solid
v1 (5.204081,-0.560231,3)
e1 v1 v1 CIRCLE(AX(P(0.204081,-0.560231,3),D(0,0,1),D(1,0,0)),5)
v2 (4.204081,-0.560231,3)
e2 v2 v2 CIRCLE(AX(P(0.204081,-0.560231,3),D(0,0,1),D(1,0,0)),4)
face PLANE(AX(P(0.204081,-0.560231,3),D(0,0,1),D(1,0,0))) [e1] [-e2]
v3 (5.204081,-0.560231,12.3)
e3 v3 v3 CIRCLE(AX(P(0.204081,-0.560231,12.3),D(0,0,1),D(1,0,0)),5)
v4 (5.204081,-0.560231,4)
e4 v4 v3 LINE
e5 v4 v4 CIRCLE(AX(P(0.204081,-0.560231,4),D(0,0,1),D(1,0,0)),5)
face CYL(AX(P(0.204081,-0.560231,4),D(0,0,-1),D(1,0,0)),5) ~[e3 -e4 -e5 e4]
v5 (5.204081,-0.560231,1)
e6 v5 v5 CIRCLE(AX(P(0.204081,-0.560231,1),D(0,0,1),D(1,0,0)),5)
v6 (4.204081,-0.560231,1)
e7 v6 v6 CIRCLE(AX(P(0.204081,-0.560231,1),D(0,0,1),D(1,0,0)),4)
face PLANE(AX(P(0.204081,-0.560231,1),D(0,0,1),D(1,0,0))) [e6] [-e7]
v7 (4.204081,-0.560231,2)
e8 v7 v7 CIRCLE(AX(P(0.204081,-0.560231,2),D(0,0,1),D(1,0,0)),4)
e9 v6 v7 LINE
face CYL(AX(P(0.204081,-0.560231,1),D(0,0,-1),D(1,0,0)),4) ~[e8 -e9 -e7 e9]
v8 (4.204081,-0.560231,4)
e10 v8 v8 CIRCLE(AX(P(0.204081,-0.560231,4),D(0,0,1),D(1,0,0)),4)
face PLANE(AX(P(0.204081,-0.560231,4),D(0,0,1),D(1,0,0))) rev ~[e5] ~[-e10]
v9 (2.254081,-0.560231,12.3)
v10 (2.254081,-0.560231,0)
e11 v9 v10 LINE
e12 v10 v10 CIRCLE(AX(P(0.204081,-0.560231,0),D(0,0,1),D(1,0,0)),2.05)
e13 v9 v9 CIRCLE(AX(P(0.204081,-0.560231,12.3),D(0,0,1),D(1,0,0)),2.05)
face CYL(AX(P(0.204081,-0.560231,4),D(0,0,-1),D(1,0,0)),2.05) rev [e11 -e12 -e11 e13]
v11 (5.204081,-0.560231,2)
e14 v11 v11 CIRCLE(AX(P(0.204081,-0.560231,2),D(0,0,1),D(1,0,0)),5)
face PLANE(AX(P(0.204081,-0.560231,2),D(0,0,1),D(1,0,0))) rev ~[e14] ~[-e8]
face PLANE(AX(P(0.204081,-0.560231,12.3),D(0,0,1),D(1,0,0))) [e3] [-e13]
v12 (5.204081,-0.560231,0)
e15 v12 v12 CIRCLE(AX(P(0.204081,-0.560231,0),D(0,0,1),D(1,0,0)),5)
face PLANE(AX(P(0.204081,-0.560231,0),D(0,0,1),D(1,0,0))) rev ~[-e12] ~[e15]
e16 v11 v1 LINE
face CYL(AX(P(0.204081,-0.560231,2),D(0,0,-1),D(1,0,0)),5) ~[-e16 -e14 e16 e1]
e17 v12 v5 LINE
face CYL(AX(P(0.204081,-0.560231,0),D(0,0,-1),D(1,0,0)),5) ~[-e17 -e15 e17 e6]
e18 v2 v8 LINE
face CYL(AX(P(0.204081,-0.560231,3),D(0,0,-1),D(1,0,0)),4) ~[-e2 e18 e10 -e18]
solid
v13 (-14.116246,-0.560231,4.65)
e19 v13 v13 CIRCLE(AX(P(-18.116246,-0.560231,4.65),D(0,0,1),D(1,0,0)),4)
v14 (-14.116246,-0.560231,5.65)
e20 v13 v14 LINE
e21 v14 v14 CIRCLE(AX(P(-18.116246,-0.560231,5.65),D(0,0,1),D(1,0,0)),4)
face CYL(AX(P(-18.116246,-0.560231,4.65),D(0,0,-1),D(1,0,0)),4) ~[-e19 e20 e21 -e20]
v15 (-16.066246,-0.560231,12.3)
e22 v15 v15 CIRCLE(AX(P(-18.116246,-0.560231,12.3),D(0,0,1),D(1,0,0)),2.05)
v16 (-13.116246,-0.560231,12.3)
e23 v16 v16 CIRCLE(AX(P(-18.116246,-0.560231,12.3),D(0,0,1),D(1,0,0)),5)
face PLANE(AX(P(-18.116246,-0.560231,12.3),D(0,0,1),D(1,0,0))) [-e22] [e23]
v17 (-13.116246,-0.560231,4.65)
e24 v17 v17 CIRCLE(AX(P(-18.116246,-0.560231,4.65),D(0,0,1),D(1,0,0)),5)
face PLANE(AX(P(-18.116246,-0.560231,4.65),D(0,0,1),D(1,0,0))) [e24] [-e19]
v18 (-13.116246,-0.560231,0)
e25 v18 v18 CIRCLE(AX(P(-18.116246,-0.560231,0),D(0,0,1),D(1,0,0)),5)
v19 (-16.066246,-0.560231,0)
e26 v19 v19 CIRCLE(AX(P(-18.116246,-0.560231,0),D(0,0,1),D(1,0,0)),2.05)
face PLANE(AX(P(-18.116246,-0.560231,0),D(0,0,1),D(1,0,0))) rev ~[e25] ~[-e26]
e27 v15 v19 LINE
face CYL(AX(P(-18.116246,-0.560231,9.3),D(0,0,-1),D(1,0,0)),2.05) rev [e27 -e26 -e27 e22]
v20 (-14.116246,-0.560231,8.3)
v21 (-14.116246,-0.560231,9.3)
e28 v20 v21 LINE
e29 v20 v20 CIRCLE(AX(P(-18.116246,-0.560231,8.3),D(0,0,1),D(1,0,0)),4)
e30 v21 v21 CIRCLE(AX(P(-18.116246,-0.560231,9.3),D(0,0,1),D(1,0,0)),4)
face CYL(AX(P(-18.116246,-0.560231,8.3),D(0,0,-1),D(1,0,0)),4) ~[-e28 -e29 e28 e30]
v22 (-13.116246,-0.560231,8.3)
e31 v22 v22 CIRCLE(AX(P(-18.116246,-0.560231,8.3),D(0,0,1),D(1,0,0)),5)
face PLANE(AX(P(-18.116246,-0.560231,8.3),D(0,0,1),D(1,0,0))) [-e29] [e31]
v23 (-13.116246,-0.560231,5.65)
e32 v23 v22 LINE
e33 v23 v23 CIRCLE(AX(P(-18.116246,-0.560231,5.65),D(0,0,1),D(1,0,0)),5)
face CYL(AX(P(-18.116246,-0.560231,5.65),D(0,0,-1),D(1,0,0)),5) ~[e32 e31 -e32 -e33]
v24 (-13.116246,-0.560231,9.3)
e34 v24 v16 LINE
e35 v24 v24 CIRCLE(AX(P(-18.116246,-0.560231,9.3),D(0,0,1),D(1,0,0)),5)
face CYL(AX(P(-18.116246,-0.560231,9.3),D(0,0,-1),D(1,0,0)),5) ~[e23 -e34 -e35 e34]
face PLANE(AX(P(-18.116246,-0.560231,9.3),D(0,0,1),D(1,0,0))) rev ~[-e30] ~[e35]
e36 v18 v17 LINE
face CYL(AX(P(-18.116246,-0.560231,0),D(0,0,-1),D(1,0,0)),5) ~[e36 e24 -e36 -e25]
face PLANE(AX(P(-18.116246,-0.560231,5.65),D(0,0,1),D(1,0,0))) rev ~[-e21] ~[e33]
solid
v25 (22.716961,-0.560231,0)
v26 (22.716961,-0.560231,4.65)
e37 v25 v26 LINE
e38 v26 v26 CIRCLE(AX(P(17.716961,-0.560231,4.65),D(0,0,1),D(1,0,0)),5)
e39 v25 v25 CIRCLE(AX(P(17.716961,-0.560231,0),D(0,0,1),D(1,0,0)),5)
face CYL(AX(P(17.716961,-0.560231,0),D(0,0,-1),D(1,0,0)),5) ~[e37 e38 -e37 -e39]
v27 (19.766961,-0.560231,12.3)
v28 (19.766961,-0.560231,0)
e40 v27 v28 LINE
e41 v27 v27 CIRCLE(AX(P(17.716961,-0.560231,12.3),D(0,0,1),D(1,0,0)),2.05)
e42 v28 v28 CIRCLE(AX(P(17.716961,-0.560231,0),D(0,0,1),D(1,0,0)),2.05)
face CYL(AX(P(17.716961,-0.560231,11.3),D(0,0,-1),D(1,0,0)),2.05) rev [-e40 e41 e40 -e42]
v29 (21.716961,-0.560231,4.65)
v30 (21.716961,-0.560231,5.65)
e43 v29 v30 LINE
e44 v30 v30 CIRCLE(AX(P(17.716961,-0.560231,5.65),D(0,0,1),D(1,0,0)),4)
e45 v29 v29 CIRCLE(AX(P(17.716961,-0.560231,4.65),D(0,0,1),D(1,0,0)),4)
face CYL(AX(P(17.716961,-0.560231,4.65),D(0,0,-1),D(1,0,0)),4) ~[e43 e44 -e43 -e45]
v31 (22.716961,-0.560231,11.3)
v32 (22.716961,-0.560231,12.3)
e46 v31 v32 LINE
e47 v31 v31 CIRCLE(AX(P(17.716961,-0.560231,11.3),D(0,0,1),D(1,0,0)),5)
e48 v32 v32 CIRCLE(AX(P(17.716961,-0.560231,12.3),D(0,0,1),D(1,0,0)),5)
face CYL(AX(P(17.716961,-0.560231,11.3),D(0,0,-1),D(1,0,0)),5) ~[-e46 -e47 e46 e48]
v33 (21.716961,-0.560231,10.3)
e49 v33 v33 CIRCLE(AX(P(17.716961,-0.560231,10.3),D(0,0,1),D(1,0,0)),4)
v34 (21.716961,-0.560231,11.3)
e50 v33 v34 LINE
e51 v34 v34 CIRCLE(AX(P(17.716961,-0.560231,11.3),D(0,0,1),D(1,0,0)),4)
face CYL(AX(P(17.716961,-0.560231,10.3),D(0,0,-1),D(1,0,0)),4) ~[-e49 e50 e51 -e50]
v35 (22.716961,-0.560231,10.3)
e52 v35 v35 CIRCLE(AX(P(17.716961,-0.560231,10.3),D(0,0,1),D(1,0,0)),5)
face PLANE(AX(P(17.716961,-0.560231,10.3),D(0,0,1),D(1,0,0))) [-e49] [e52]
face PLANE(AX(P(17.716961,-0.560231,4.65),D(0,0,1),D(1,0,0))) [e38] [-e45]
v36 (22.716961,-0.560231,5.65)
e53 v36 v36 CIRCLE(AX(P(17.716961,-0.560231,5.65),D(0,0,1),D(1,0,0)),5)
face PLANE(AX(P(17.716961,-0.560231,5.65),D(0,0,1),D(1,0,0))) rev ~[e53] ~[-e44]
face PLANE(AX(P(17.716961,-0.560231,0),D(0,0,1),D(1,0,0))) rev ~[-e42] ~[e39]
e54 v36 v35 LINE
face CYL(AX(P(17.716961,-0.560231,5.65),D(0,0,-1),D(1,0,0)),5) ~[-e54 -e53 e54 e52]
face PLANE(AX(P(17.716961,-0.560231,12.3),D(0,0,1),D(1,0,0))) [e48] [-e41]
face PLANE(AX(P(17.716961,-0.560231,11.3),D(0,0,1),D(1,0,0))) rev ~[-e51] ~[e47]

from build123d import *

# Parameters (mm, degrees)
F0_R      = 5
F0_R_2    = 2.05
F1_DEPTH  = 1
F2_R      = 4
F2_R_2    = 2.05
F3_DEPTH  = 1
F4_R      = 5
F4_R_2    = 4
F4_R_3    = 2.05
F5_DEPTH  = 1
F6_R      = 4
F6_R_2    = 2.05
F7_DEPTH  = 1
F8_R      = 5
F8_R_2    = 4
F8_R_3    = 2.05
F9_DEPTH  = 8.3
F10_DEPTH = 4.65
F11_R     = 4
F11_R_2   = 2.05
F12_DEPTH = 1
F13_R     = 5
F13_R_2   = 4
F13_R_3   = 2.05
F14_DEPTH = 4.65
F15_DEPTH = 4.65
F16_R     = 4
F16_R_2   = 2.05
F17_DEPTH = 1
F18_R     = 5
F18_R_2   = 4
F18_R_3   = 2.05
F19_DEPTH = 2.65
F20_R     = 4
F20_R_2   = 2.05
F21_DEPTH = 1
F22_R     = 5
F22_R_2   = 4
F22_R_3   = 2.05
F23_DEPTH = 3
F24_R     = 4
F24_R_2   = 2.05
F25_DEPTH = 1
F26_R     = 5
F26_R_2   = 4
F26_R_3   = 2.05
F27_DEPTH = 1


with BuildPart() as f1:
    # F0 (on Top) → F1 (new body)
    with BuildSketch(Plane.XY):
        with Locations((0.204080643, -0.5602314472)):
            Circle(F0_R)
        with Locations((0.204080643, -0.5602314472)):
            Circle(F0_R_2, mode=Mode.SUBTRACT)
    extrude(amount=F1_DEPTH)

    # F2 (on face) → F3 (join)
    with BuildSketch(Plane.XY.offset(1)):
        with Locations((0.204080643, -0.5602314472)):
            Circle(F2_R)
        with Locations((0.204080643, -0.5602314472)):
            Circle(F2_R_2, mode=Mode.SUBTRACT)
    extrude(amount=F3_DEPTH)

    # F4 (on face) → F5 (join)
    with BuildSketch(Plane.XY.offset(2)):
        with Locations((0.204080643, -0.5602314472)):
            Circle(F4_R)
        with Locations((0.204080643, -0.5602314472)):
            Circle(F4_R_2, mode=Mode.SUBTRACT)
        with Locations((0.204080643, -0.5602314472)):
            Circle(F4_R_2)
        with Locations((0.204080643, -0.5602314472)):
            Circle(F4_R_3, mode=Mode.SUBTRACT)
    extrude(amount=F5_DEPTH)

    # F6 (on face) → F7 (join)
    with BuildSketch(Plane.XY.offset(3)):
        with Locations((0.204080643, -0.5602314472)):
            Circle(F6_R)
        with Locations((0.204080643, -0.5602314472)):
            Circle(F6_R_2, mode=Mode.SUBTRACT)
    extrude(amount=F7_DEPTH)

    # F8 (on face) → F9 (join)
    with BuildSketch(Plane.XY.offset(4)):
        with Locations((0.204080643, -0.5602314472)):
            Circle(F8_R)
        with Locations((0.204080643, -0.5602314472)):
            Circle(F8_R_2, mode=Mode.SUBTRACT)
        with Locations((0.204080643, -0.5602314472)):
            Circle(F8_R_2)
        with Locations((0.204080643, -0.5602314472)):
            Circle(F8_R_3, mode=Mode.SUBTRACT)
    extrude(amount=F9_DEPTH)


with BuildPart() as f10:
    # F0 (on Top) → F10 (new body)
    with BuildSketch(Plane.XY):
        with Locations((17.7169614471, -0.5602314472)):
            Circle(F0_R)
        with Locations((17.7169614471, -0.5602314472)):
            Circle(F0_R_2, mode=Mode.SUBTRACT)
    extrude(amount=F10_DEPTH)

    # F11 (on face) → F12 (join)
    with BuildSketch(Plane.XY.offset(4.65)):
        with Locations((17.7169614471, -0.5602314472)):
            Circle(F11_R)
        with Locations((17.7169614471, -0.5602314472)):
            Circle(F11_R_2, mode=Mode.SUBTRACT)
    extrude(amount=F12_DEPTH)

    # F13 (on face) → F14 (join)
    with BuildSketch(Plane.XY.offset(5.65)):
        with Locations((17.7169614471, -0.5602314472)):
            Circle(F13_R)
        with Locations((17.7169614471, -0.5602314472)):
            Circle(F13_R_2, mode=Mode.SUBTRACT)
        with Locations((17.7169614471, -0.5602314472)):
            Circle(F13_R_2)
        with Locations((17.7169614471, -0.5602314472)):
            Circle(F13_R_3, mode=Mode.SUBTRACT)
    extrude(amount=F14_DEPTH)

    # F24 (on face) → F25 (join)
    with BuildSketch(Plane.XY.offset(10.3)):
        with Locations((17.7169614471, -0.5602314472)):
            Circle(F24_R)
        with Locations((17.7169614471, -0.5602314472)):
            Circle(F24_R_2, mode=Mode.SUBTRACT)
    extrude(amount=F25_DEPTH)

    # F26 (on face) → F27 (join)
    with BuildSketch(Plane.XY.offset(11.3)):
        with Locations((17.7169614471, -0.5602314472)):
            Circle(F26_R)
        with Locations((17.7169614471, -0.5602314472)):
            Circle(F26_R_2, mode=Mode.SUBTRACT)
        with Locations((17.7169614471, -0.5602314472)):
            Circle(F26_R_2)
        with Locations((17.7169614471, -0.5602314472)):
            Circle(F26_R_3, mode=Mode.SUBTRACT)
    extrude(amount=F27_DEPTH)


with BuildPart() as f15:
    # F0 (on Top) → F15 (new body)
    with BuildSketch(Plane.XY):
        with Locations((-18.1162464432, -0.5602314472)):
            Circle(F0_R)
        with Locations((-18.1162464432, -0.5602314472)):
            Circle(F0_R_2, mode=Mode.SUBTRACT)
    extrude(amount=F15_DEPTH)

    # F16 (on face) → F17 (join)
    with BuildSketch(Plane.XY.offset(4.65)):
        with Locations((-18.1162464432, -0.5602314472)):
            Circle(F16_R)
        with Locations((-18.1162464432, -0.5602314472)):
            Circle(F16_R_2, mode=Mode.SUBTRACT)
    extrude(amount=F17_DEPTH)

    # F18 (on face) → F19 (join)
    with BuildSketch(Plane.XY.offset(5.65)):
        with Locations((-18.1162464432, -0.5602314472)):
            Circle(F18_R)
        with Locations((-18.1162464432, -0.5602314472)):
            Circle(F18_R_2, mode=Mode.SUBTRACT)
        with Locations((-18.1162464432, -0.5602314472)):
            Circle(F18_R_2)
        with Locations((-18.1162464432, -0.5602314472)):
            Circle(F18_R_3, mode=Mode.SUBTRACT)
    extrude(amount=F19_DEPTH)

    # F20 (on face) → F21 (join)
    with BuildSketch(Plane.XY.offset(8.3)):
        with Locations((-18.1162464432, -0.5602314472)):
            Circle(F20_R)
        with Locations((-18.1162464432, -0.5602314472)):
            Circle(F20_R_2, mode=Mode.SUBTRACT)
    extrude(amount=F21_DEPTH)

    # F22 (on face) → F23 (join)
    with BuildSketch(Plane.XY.offset(9.3)):
        with Locations((-18.1162464432, -0.5602314472)):
            Circle(F22_R)
        with Locations((-18.1162464432, -0.5602314472)):
            Circle(F22_R_2, mode=Mode.SUBTRACT)
        with Locations((-18.1162464432, -0.5602314472)):
            Circle(F22_R_2)
        with Locations((-18.1162464432, -0.5602314472)):
            Circle(F22_R_3, mode=Mode.SUBTRACT)
    extrude(amount=F23_DEPTH)


solid = Compound([f1.part, f10.part, f15.part])
